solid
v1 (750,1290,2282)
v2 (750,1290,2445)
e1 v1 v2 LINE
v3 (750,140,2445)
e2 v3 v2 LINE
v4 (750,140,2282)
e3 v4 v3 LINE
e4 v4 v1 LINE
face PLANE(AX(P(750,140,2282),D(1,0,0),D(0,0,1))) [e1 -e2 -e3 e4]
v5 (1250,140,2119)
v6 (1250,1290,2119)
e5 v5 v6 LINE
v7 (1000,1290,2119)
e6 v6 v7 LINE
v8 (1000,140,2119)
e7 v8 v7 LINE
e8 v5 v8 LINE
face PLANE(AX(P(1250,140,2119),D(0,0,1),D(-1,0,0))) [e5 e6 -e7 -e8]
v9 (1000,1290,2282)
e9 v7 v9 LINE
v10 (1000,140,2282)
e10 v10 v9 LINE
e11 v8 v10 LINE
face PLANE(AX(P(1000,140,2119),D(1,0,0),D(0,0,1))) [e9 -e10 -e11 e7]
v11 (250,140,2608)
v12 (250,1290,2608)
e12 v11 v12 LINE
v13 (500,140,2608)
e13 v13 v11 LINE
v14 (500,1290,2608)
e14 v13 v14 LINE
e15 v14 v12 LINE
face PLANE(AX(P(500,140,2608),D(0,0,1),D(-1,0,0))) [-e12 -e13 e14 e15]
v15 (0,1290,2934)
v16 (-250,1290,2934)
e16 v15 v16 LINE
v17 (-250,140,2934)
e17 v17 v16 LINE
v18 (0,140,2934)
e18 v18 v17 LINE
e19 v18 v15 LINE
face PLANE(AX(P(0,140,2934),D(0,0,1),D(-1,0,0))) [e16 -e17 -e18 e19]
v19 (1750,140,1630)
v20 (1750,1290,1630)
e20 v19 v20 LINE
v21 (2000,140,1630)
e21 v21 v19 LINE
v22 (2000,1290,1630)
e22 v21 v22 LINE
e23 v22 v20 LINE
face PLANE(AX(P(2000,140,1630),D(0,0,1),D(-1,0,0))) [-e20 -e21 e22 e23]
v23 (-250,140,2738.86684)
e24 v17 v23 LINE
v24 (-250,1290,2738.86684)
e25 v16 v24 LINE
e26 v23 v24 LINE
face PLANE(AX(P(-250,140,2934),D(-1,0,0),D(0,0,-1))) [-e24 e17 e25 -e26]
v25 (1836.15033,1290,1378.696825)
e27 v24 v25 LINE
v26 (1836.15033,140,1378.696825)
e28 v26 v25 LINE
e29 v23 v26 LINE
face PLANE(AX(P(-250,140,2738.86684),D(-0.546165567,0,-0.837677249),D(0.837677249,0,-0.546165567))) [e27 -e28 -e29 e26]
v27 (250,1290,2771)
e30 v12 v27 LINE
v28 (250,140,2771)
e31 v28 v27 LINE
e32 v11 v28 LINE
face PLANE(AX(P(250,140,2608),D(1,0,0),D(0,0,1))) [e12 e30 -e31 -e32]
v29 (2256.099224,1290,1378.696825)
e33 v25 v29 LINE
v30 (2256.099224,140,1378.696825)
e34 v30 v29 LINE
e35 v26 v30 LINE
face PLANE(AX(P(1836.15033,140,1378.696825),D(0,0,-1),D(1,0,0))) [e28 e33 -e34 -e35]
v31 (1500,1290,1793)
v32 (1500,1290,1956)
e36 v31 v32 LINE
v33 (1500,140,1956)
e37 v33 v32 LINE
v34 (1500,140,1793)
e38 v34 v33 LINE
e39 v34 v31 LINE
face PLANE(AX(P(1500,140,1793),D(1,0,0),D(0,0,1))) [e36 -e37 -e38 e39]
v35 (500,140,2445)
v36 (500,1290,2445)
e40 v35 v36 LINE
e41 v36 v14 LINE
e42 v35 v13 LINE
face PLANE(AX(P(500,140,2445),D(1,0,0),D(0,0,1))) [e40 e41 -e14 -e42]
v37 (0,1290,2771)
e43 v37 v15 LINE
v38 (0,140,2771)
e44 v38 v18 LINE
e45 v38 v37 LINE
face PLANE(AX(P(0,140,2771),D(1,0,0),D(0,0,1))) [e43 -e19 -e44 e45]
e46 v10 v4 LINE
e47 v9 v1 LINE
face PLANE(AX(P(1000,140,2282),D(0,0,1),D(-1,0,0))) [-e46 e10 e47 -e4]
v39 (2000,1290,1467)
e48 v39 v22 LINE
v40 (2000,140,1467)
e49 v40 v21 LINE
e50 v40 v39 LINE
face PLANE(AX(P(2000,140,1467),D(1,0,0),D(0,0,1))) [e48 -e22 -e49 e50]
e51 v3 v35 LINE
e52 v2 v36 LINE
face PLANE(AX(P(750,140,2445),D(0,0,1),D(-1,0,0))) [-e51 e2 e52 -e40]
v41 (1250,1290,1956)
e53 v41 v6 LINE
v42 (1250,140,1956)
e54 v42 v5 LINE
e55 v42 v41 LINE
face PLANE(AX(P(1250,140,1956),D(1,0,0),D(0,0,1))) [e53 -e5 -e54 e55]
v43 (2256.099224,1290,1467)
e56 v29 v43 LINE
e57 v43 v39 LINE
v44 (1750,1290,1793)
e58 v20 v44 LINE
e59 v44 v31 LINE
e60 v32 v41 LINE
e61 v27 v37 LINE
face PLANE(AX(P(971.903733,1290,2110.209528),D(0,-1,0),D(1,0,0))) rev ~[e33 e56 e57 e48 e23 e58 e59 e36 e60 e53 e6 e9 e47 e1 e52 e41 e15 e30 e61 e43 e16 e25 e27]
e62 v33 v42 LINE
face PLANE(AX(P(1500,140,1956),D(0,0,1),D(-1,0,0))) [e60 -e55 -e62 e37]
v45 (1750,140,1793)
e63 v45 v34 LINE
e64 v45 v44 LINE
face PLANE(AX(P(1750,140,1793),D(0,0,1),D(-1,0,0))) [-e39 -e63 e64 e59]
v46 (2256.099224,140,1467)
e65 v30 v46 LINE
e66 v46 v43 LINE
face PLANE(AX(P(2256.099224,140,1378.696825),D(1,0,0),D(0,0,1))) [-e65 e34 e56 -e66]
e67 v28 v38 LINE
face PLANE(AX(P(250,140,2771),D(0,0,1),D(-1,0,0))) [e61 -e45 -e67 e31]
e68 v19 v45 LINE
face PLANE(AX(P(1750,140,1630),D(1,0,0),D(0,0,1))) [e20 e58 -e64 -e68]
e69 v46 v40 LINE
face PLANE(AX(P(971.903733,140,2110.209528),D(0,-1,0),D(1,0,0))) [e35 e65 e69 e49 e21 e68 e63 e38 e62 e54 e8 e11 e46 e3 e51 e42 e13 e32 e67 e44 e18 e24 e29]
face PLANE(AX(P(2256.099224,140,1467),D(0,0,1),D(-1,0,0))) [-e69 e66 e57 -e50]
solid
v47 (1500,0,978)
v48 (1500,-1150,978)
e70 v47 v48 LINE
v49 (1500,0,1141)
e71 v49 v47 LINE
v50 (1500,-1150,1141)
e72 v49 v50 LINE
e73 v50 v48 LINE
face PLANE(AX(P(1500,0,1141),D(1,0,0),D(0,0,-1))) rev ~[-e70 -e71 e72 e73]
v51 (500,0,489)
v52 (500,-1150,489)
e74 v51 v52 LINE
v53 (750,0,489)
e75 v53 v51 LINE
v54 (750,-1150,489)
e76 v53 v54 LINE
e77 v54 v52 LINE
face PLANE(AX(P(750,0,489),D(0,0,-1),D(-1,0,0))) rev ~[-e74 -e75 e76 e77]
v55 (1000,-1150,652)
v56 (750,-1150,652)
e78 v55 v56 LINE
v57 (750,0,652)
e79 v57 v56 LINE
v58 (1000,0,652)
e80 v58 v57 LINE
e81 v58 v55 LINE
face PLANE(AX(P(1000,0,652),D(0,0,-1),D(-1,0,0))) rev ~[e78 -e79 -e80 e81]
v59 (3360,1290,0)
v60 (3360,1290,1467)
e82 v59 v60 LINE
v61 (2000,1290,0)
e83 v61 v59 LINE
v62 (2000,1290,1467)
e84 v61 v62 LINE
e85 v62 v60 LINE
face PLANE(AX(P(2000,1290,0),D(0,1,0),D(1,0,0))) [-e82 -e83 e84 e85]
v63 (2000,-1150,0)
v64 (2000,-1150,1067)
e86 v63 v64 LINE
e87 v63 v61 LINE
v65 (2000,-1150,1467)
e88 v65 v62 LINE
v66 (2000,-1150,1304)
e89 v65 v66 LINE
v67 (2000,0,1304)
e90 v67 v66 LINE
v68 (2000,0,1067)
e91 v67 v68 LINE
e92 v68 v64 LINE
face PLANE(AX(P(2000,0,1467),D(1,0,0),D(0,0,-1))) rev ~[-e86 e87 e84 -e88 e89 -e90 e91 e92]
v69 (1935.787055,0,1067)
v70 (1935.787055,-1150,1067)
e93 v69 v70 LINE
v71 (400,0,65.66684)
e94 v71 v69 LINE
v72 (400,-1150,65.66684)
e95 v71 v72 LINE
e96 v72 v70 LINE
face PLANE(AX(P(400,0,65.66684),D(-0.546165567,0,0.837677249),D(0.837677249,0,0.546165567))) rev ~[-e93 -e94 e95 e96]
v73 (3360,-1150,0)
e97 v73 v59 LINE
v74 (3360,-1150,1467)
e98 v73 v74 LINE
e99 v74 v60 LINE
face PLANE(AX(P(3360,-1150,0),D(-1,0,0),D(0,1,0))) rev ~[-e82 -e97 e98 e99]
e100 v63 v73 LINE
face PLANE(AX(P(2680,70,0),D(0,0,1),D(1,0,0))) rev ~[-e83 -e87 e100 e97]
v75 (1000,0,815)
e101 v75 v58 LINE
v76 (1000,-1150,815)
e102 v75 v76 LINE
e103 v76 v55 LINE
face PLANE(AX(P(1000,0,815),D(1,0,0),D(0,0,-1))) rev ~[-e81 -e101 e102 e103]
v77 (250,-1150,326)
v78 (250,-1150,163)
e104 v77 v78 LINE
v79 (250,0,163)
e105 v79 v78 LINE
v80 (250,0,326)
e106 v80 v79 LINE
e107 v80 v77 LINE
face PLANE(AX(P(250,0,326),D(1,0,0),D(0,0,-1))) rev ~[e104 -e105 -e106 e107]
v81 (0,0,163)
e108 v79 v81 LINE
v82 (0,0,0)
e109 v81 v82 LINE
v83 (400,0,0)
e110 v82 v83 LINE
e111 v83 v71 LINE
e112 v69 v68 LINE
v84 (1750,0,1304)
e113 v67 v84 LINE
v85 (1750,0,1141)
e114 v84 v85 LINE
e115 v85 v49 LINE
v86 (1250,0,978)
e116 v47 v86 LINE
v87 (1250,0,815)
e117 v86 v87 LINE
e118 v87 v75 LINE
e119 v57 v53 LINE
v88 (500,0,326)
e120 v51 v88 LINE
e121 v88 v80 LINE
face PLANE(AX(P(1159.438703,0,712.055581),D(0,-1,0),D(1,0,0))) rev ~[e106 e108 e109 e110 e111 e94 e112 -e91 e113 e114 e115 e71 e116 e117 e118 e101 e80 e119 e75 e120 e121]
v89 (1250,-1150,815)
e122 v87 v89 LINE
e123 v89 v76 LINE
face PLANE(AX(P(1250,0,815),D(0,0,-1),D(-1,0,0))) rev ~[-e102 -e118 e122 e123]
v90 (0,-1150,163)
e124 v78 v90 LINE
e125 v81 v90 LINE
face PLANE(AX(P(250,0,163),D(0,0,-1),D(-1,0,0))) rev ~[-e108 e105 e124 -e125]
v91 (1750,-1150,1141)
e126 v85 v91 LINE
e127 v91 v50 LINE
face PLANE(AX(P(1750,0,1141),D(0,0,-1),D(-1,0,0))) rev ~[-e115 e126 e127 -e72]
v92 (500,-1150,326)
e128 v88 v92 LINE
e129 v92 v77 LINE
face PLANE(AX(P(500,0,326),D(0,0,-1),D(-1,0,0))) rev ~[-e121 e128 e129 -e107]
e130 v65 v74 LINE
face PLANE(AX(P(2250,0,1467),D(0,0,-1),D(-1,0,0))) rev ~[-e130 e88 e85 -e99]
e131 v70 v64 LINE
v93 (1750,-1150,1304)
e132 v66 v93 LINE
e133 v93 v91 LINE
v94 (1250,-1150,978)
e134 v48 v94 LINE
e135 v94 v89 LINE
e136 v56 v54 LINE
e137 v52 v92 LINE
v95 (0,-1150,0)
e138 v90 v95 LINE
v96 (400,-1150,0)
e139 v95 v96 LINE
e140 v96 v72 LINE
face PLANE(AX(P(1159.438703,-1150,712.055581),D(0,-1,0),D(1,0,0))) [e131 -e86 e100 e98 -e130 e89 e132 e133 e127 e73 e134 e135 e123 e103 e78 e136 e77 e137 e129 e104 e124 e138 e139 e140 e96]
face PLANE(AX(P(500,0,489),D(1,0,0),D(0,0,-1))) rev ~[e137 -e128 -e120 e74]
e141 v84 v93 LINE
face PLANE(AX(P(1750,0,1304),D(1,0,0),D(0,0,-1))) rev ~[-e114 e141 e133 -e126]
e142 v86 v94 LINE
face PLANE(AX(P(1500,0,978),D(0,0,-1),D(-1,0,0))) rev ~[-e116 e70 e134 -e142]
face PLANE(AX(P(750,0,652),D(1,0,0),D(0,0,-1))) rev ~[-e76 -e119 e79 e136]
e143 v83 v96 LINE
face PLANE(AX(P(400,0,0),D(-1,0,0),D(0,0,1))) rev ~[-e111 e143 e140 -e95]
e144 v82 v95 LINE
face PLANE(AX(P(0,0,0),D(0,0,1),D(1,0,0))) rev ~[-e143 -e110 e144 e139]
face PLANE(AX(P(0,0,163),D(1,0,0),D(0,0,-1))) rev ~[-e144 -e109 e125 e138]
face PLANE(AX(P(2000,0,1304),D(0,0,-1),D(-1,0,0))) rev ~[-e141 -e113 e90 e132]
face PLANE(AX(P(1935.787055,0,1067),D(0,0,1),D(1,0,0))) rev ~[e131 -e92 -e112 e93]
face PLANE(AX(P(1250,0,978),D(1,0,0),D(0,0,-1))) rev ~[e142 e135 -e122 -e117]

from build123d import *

# Parameters (mm, degrees)
F1_DEPTH = 1150
F4_DEPTH = 1150
F5_W     = 1360
F5_H     = 2440
F6_DEPTH = 1467


with BuildPart() as f1:
    # F0 (on Front) → F1 (new body)
    with BuildSketch(Plane.XZ):
        Polygon((0, 163), (0, 0), (400, 0), (400, 65.6668404071), (1935.7870545904, 1067), (2250, 1067), (2250, 1467), (2000, 1467), (2000, 1304), (1750, 1304), (1750, 1141), (1500, 1141), (1500, 978), (1250, 978), (1250, 815), (1000, 815), (1000, 652), (750, 652), (750, 489), (500, 489), (500, 326), (250, 326), (250, 163), align=None)
    extrude(amount=F1_DEPTH)

    # F5 (on Top) → F6 (join)
    with BuildSketch(Plane.XY):
        with Locations((2680, 70)):
            Rectangle(F5_W, F5_H)
    extrude(amount=F6_DEPTH)


with BuildPart() as f4:
    # F3 (on offset) → F4 (new body)
    with BuildSketch(Plane.XZ.offset(-140)):
        Polygon((2000, 1630), (1750, 1630), (1750, 1793), (1500, 1793), (1500, 1956), (1250, 1956), (1250, 2119), (1000, 2119), (1000, 2282), (750, 2282), (750, 2445), (500, 2445), (500, 2608), (250, 2608), (250, 2771), (0, 2771), (0, 2934), (-250, 2934), (-250, 2738.8668404071), (1836.1503300429, 1378.6968252191), (2256.0992240906, 1378.6968252191), (2256.0992240906, 1467), (2000, 1467), align=None)
    extrude(amount=-F4_DEPTH)


solid = Compound([f1.part, f4.part])
